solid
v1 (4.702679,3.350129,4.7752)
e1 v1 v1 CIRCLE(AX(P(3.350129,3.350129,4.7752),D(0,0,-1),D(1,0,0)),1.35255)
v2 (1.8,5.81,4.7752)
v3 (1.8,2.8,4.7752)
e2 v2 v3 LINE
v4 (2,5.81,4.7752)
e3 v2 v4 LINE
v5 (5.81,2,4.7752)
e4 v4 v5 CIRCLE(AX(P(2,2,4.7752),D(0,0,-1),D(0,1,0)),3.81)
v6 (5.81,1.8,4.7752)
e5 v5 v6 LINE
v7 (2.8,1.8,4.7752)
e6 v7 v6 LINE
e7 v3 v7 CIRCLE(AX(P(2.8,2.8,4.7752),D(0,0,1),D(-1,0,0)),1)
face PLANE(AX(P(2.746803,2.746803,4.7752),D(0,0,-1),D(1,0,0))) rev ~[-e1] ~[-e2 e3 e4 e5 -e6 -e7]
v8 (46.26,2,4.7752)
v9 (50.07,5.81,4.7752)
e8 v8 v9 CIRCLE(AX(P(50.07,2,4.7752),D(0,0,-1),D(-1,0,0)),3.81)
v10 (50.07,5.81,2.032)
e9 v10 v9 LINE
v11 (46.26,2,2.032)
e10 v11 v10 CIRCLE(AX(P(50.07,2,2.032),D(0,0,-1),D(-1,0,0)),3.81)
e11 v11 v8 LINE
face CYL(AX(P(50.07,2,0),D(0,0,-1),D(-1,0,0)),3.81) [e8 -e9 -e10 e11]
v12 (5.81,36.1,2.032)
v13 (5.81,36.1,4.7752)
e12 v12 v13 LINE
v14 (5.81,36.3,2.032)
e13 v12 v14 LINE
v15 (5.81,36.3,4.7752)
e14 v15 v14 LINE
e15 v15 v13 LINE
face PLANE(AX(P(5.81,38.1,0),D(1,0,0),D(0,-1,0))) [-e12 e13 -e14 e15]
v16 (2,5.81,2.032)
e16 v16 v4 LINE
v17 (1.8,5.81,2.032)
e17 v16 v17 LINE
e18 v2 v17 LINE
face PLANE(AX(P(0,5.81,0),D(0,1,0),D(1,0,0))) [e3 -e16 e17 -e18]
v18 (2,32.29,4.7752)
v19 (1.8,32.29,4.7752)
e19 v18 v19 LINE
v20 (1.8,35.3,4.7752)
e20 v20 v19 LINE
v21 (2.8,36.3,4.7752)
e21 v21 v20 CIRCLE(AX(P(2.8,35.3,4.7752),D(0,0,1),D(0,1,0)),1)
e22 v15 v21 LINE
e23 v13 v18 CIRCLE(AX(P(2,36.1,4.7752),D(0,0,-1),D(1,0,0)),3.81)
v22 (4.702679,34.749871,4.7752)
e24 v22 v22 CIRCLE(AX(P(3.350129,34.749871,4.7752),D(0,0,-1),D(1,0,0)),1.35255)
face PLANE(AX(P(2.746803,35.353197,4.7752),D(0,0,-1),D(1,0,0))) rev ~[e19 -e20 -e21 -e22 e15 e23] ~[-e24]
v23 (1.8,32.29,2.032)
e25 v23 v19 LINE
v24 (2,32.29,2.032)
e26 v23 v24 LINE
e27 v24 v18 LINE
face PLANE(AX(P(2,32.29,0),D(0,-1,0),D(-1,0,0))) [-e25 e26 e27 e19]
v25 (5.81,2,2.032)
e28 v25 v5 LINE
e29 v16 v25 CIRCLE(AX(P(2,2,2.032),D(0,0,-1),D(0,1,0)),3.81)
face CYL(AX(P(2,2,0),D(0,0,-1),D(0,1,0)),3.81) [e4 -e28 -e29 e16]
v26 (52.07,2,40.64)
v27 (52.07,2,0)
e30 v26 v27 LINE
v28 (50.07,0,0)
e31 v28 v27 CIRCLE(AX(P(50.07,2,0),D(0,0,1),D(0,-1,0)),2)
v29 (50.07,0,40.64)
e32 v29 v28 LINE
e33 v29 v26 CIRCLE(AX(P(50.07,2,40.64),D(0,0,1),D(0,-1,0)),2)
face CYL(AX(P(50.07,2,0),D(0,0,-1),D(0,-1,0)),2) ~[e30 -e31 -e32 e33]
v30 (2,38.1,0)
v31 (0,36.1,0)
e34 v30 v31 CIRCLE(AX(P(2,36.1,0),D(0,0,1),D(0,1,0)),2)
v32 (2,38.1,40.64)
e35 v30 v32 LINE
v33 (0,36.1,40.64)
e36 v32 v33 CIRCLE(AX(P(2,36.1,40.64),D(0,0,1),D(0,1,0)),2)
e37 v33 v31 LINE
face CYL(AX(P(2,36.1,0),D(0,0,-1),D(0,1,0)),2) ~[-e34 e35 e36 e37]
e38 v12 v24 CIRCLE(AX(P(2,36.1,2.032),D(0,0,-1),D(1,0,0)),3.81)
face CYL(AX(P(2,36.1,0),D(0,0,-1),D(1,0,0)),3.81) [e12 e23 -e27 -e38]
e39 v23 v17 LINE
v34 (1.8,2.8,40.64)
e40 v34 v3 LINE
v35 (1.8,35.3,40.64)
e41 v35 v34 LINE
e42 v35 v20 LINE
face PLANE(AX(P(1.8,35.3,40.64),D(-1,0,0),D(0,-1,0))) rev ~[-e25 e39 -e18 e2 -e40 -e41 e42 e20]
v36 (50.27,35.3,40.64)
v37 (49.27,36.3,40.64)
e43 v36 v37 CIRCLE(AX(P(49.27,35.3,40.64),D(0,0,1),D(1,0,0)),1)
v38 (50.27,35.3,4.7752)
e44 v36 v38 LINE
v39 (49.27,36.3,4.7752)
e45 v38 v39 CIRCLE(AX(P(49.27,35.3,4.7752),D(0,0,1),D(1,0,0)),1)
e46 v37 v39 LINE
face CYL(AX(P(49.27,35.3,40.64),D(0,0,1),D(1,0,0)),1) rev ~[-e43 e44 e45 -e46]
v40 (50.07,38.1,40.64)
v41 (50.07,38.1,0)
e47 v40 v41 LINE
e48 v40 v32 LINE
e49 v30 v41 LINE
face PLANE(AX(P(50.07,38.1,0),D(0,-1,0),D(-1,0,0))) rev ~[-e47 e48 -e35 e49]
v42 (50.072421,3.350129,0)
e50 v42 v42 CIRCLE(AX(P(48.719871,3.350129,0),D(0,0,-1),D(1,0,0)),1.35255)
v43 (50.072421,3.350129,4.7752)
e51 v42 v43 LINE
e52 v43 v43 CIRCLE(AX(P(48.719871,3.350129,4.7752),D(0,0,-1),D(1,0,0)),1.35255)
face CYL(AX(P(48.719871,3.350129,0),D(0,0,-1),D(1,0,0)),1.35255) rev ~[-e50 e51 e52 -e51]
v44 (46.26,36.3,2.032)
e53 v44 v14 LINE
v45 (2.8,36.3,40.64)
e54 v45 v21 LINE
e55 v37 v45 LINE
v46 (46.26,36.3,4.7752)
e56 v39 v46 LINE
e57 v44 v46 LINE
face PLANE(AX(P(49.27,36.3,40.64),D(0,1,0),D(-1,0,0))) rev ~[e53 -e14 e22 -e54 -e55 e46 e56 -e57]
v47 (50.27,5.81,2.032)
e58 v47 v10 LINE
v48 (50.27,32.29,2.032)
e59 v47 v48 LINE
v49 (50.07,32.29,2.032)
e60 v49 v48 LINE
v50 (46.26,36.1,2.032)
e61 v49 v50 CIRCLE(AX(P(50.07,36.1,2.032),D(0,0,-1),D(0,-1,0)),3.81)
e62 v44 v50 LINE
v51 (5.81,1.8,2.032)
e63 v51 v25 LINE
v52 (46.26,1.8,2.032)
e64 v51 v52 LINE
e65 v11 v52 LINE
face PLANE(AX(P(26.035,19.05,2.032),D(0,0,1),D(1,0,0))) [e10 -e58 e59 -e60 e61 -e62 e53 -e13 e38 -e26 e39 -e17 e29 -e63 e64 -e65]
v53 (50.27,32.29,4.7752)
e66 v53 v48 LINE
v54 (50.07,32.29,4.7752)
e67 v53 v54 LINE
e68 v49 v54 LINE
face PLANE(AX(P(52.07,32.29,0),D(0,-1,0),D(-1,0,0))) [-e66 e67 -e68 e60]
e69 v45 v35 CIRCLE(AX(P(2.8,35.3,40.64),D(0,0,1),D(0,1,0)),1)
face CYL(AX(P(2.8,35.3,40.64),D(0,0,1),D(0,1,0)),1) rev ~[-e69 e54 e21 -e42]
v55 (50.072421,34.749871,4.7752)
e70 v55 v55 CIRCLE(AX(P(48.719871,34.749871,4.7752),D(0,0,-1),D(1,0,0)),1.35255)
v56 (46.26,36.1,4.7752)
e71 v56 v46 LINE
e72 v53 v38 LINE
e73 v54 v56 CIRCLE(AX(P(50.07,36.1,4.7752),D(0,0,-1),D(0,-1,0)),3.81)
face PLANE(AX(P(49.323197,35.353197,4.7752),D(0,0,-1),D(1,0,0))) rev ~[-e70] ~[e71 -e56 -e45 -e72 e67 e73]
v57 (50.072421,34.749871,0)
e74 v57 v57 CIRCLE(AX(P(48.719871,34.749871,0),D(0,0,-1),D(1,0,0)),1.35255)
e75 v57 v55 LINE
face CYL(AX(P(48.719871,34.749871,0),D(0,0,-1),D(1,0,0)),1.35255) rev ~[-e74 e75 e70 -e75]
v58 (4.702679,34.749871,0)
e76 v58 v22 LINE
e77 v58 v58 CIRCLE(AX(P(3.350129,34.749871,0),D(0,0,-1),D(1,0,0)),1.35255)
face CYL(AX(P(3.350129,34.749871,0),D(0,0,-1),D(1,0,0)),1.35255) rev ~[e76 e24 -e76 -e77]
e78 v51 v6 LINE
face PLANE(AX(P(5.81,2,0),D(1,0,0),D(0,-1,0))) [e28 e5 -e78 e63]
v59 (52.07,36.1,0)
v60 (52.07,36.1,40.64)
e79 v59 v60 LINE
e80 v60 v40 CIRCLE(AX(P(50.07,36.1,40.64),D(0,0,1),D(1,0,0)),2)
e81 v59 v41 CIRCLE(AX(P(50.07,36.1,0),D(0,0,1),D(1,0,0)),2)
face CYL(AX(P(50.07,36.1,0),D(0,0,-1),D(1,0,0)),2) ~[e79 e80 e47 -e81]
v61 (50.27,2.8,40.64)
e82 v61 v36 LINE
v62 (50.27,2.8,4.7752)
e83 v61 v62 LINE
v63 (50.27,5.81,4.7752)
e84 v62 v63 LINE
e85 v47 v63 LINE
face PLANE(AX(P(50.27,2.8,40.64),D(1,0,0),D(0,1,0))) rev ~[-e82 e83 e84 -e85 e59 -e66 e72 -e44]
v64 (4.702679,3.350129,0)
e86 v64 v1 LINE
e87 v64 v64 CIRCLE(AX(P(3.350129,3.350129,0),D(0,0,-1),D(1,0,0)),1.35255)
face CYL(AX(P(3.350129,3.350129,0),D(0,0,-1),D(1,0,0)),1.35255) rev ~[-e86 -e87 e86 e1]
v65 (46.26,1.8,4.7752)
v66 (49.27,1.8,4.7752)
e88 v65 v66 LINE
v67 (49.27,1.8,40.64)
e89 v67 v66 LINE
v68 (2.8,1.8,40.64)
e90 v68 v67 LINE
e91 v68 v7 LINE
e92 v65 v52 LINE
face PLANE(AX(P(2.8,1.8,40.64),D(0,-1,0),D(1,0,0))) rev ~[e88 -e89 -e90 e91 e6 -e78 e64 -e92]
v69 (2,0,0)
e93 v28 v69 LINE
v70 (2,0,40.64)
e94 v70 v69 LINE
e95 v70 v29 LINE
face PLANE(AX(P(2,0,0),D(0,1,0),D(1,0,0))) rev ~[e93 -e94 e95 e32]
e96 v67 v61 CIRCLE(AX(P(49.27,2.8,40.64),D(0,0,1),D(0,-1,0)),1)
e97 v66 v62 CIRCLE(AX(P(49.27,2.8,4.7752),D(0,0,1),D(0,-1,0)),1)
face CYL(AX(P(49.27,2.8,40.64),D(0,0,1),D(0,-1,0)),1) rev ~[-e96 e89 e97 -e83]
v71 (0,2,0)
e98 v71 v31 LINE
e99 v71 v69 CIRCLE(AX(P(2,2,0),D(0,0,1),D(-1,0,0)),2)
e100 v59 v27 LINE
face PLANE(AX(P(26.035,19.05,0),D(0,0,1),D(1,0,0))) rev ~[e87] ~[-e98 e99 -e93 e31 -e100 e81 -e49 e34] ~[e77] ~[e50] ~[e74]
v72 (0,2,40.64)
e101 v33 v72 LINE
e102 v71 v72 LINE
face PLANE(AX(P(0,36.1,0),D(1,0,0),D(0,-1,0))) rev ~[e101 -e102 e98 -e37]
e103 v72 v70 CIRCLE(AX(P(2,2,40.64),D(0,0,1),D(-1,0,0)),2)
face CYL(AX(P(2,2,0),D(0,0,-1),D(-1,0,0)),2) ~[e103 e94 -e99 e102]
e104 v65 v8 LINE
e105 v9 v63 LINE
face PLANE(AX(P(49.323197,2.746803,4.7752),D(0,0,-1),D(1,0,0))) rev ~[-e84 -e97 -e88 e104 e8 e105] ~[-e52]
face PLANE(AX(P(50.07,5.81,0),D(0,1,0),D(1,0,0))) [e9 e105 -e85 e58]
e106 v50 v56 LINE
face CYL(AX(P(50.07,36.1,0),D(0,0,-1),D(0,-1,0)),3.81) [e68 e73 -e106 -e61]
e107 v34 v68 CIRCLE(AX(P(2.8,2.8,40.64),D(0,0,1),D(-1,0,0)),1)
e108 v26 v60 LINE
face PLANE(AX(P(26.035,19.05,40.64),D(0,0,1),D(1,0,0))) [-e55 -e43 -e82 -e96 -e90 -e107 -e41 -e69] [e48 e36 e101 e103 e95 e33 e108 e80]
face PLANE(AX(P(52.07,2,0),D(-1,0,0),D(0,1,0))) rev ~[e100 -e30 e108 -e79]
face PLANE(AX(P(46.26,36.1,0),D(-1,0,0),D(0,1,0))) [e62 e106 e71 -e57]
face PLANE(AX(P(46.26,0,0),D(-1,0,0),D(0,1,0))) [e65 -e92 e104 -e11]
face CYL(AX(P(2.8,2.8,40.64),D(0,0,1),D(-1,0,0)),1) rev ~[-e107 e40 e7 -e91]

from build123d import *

# Parameters (mm, degrees)
F1_DEPTH = 40.64
F3_DEPTH = 38.608
F5_DEPTH = 4.7752
F6_R     = 1.35255
F7_DEPTH = 4.7752


# Not quite as in the source:
# - a feature names something its author has since deleted; it is built from what else it names


with BuildPart() as f1:
    # F0 (on Top) → F1 (new body)
    with BuildSketch(Plane.XY):
        with BuildLine():
            ThreePointArc((0, 2), (0.5857864376, 0.5857864376), (2, 0))
            Line((2, 0), (50.07, 0))
            ThreePointArc((50.07, 0), (51.4842135624, 0.5857864376), (52.07, 2))
            Line((52.07, 2), (52.07, 36.1))
            ThreePointArc((52.07, 36.1), (51.4842135624, 37.5142135624), (50.07, 38.1))
            Line((50.07, 38.1), (2, 38.1))
            ThreePointArc((2, 38.1), (0.5857864376, 37.5142135624), (0, 36.1))
            Line((0, 36.1), (0, 2))
        make_face()
    extrude(amount=F1_DEPTH)

    # F2 (on face) → F3 (cut)
    with BuildSketch(Plane.XY.offset(40.64)):
        with BuildLine():
            Line((49.27, 36.3), (2.8, 36.3))
            ThreePointArc((2.8, 36.3), (2.0928932188, 36.0071067812), (1.8, 35.3))
            Line((1.8, 35.3), (1.8, 2.8))
            ThreePointArc((1.8, 2.8), (2.0928932188, 2.0928932188), (2.8, 1.8))
            Line((2.8, 1.8), (49.27, 1.8))
            ThreePointArc((49.27, 1.8), (49.9771067812, 2.0928932188), (50.27, 2.8))
            Line((50.27, 2.8), (50.27, 35.3))
            ThreePointArc((50.27, 35.3), (49.9771067812, 36.0071067812), (49.27, 36.3))
        make_face()
    extrude(amount=-F3_DEPTH, mode=Mode.SUBTRACT)

    # F4 (on face) → F5 (join)
    with BuildSketch(Plane(origin=(0, 0, 0), x_dir=(1, 0, 0), z_dir=(0, 0, -1))):
        with BuildLine():
            ThreePointArc((52.07, -2), (51.4842135624, -0.5857864376), (50.07, 0))
            Line((50.07, 0), (46.26, 0))
            Line((46.26, 0), (46.26, -2))
            ThreePointArc((46.26, -2), (47.3759231637, -4.6940768363), (50.07, -5.81))
            Line((50.07, -5.81), (52.07, -5.81))
            Line((52.07, -5.81), (52.07, -2))
        make_face()
        with BuildLine():
            Line((46.26, -36.1), (46.26, -38.1))
            Line((46.26, -38.1), (50.07, -38.1))
            ThreePointArc((50.07, -38.1), (51.4842135624, -37.5142135624), (52.07, -36.1))
            Line((52.07, -36.1), (52.07, -32.29))
            Line((52.07, -32.29), (50.07, -32.29))
            ThreePointArc((50.07, -32.29), (47.3759231637, -33.4059231637), (46.26, -36.1))
        make_face()
        with BuildLine():
            ThreePointArc((5.81, -36.1), (4.6940768363, -33.4059231637), (2, -32.29))
            Line((2, -32.29), (0, -32.29))
            Line((0, -32.29), (0, -36.1))
            ThreePointArc((0, -36.1), (0.5857864376, -37.5142135624), (2, -38.1))
            Line((2, -38.1), (5.81, -38.1))
            Line((5.81, -38.1), (5.81, -36.1))
        make_face()
        with BuildLine():
            Line((5.81, 0), (2, 0))
            ThreePointArc((2, 0), (0.5857864376, -0.5857864376), (0, -2))
            Line((0, -2), (0, -5.81))
            Line((0, -5.81), (2, -5.81))
            ThreePointArc((2, -5.81), (4.6940768363, -4.6940768363), (5.81, -2))
            Line((5.81, -2), (5.81, 0))
        make_face()
    extrude(amount=-F5_DEPTH)

    # F6 (on face) → F7 (cut, through all)
    with BuildSketch(Plane(origin=(0, 0, 0), x_dir=(1, 0, 0), z_dir=(0, 0, -1))):
        with Locations((48.7198709242, -3.3501290758)):
            Circle(F6_R)
        with Locations((3.3501290758, -3.3501290758)):
            Circle(F6_R)
        with Locations((3.3501290758, -34.7498709242)):
            Circle(F6_R)
        with Locations((48.7198709242, -34.7498709242)):
            Circle(F6_R)
    extrude(amount=-F7_DEPTH, mode=Mode.SUBTRACT)


solid = f1.part
